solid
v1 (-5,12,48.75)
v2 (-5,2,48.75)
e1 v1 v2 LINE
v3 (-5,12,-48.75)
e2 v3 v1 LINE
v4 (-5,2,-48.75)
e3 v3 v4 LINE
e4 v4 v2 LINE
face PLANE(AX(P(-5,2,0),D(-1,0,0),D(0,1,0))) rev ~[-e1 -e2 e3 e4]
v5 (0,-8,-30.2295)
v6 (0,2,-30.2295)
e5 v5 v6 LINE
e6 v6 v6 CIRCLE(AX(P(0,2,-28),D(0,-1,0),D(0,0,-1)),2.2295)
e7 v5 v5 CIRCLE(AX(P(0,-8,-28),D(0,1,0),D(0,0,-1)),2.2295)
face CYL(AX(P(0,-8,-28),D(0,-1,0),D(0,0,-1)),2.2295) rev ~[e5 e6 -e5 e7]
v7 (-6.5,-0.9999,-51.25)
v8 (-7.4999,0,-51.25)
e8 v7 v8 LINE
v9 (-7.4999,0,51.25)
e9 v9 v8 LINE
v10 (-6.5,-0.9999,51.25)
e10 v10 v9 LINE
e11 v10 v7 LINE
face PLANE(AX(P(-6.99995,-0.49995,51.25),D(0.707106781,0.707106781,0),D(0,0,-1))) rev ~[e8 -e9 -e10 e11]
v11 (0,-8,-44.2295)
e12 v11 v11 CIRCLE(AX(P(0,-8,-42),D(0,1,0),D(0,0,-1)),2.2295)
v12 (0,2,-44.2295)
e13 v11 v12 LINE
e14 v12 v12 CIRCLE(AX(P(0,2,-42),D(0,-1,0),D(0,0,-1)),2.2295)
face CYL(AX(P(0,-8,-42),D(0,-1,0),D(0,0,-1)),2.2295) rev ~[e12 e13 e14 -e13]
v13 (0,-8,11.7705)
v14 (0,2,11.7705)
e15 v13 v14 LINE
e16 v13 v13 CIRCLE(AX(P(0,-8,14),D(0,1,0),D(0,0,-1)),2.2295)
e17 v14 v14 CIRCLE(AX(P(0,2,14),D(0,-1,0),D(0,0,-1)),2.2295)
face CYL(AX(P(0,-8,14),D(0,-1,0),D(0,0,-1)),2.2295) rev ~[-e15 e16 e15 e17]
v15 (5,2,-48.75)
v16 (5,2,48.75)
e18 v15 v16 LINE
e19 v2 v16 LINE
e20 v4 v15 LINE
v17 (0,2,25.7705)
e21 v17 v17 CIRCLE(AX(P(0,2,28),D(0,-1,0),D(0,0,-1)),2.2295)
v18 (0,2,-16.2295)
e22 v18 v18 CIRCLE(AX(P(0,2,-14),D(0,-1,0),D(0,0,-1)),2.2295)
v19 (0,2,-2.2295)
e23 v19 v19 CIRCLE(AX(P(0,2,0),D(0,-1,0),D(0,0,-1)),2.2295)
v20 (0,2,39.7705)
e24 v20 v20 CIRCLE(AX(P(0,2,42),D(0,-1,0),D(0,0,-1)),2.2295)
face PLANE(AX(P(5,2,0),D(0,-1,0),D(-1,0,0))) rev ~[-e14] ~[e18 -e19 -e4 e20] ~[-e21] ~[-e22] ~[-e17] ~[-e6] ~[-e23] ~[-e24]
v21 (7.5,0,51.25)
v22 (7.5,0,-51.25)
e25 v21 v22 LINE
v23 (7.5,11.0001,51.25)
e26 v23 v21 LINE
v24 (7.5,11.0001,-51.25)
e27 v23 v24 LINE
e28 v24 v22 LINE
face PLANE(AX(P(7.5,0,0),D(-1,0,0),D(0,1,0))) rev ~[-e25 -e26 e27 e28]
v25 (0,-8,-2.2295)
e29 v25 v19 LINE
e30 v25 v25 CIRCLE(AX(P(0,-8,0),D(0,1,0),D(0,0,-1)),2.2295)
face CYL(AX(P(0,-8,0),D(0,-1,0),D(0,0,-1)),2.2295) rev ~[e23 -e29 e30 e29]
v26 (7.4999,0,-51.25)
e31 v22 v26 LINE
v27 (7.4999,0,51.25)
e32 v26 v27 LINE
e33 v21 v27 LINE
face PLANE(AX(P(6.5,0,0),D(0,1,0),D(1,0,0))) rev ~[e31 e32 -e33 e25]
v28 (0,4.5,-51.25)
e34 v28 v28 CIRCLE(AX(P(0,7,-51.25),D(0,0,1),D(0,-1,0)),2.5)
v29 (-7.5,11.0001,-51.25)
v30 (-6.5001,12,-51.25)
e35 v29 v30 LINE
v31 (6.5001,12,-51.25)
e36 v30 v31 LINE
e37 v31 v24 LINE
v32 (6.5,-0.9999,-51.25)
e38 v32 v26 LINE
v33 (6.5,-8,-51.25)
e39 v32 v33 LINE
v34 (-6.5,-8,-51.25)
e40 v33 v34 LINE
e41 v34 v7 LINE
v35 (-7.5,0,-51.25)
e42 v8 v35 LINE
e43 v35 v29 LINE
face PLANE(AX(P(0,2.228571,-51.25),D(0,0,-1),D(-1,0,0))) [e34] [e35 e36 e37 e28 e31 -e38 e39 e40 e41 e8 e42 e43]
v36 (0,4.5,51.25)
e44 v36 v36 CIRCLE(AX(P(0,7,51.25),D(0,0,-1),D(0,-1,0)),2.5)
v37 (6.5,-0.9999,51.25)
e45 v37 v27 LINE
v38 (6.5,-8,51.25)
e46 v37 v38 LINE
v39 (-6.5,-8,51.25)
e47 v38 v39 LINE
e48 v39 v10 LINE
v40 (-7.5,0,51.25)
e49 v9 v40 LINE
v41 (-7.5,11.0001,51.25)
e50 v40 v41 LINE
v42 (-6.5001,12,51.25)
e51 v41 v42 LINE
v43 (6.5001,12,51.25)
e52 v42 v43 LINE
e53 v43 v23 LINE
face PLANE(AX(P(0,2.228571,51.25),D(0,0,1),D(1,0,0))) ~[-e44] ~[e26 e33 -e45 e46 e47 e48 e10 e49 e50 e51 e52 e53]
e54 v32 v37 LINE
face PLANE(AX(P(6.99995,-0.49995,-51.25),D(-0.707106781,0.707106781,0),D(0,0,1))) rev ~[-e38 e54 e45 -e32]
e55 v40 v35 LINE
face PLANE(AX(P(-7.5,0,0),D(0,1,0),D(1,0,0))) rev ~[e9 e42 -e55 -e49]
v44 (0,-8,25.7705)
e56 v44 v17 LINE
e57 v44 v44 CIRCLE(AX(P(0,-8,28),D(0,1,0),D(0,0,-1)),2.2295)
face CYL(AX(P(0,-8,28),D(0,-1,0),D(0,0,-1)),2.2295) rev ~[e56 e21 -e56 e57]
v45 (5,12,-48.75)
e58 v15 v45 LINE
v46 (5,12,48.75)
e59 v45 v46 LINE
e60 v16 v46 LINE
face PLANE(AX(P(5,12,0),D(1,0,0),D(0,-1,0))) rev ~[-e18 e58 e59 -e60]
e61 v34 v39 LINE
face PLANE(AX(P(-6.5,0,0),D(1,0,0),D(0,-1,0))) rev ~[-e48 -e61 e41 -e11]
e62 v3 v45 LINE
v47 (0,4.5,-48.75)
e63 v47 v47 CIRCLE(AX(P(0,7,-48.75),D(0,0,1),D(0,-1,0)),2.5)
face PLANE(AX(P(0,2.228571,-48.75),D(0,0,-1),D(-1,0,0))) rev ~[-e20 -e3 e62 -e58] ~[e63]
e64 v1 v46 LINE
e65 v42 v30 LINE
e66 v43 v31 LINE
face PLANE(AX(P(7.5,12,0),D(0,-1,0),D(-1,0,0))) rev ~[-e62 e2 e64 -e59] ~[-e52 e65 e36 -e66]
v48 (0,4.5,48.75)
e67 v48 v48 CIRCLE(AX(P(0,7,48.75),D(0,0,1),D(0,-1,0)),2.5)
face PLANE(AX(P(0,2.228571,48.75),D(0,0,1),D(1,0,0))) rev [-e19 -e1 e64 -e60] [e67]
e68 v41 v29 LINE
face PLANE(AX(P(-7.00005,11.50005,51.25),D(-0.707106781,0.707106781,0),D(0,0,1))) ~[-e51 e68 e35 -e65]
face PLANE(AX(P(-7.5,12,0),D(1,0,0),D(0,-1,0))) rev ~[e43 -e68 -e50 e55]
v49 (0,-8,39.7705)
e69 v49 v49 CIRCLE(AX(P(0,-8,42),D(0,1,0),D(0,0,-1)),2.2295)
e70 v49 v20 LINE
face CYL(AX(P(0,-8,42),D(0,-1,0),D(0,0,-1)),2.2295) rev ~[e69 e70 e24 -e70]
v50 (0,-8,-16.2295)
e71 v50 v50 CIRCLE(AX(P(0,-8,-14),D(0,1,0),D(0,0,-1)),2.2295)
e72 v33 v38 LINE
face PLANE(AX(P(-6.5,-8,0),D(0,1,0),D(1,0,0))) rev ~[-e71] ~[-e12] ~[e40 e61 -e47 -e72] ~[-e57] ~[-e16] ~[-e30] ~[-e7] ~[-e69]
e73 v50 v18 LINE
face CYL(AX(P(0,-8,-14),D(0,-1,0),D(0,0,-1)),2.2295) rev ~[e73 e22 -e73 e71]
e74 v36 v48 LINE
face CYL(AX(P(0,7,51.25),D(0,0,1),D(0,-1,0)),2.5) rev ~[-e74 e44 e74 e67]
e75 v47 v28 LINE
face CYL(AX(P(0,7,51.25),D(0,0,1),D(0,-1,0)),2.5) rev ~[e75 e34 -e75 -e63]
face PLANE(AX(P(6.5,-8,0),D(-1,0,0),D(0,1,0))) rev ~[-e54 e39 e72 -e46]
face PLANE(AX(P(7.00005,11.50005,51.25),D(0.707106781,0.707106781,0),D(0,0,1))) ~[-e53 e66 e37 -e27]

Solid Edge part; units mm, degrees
sketch "Sketch1" plane through (0, 0, 0) normal (0, 0, 1) x (1, 0, 0)
  line L0 (-6.5, 0) -> (-6.5, -8)
  line L1 (-6.5, -8) -> (6.5, -8)
  line L2 (6.5, -8) -> (6.5, 0)
  line L3 (6.5, 0) -> (7.5, 0)
  line L4 (7.5, 0) -> (7.5, 12)
  line L5 (7.5, 12) -> (5, 12)
  line L6 (5, 12) -> (5, 2)
  line L7 (5, 2) -> (-5, 2)
  line L8 (-5, 2) -> (-5, 12)
  line L9 (-5, 12) -> (-7.5, 12)
  line L10 (-7.5, 12) -> (-7.5, 0)
  line L11 (-7.5, 0) -> (-6.5, 0)
  dimension "D1" = 13
  dimension "D2" = 15
  dimension "D3" = 8
  dimension "D4" = 10
  dimension "D5" = 2.5
  dimension "D6" = 10
  dimension "D7" = 12
extrude "Ajout_matière_1" add sketch "Sketch1" along normal mid plane 100
hole "Perçage_1" at (0, -8, 42) direction (0, 1, 0) diameter 4.459 end up to next
pattern_linear "Pattern1" count 7 spacing 14 along (0, 0, -1) of "Perçage_1"
sketch "Sketch2" plane through (0, 2, -50) normal (0, 0, -1) x (0, 1, 0)
  line L0 (-10, -6.5) -> (-2, -6.5)
  line L1 (-2, -6.5) -> (-2, -7.5)
  line L2 (-2, -7.5) -> (10, -7.5)
  line L3 (10, -7.5) -> (10, 7.5)
  line L4 (10, 7.5) -> (-2, 7.5)
  line L5 (-2, 7.5) -> (-2, 6.5)
  line L6 (-2, 6.5) -> (-10, 6.5)
  line L7 (-10, 6.5) -> (-10, -6.5)
extrude "Protrusion1" add sketch "Sketch2" along normal mid plane 2.5
mirror "Mirror1" about plane through (0, 0, 0) normal (0, 0, 1) of "Protrusion1"
hole "Perçage_2" at (0, 7, 51.25) direction (0, 0, -1) diameter 5 end through all
chamfer "Chamfer1" distance 1 angle 45 4 edges at (-7.5, 12, 0) (-6.5, 0, 0) (6.5, 0, 0) (7.5, 12, 0)
properties material "Aluminium AU4G, 2024_T4"
